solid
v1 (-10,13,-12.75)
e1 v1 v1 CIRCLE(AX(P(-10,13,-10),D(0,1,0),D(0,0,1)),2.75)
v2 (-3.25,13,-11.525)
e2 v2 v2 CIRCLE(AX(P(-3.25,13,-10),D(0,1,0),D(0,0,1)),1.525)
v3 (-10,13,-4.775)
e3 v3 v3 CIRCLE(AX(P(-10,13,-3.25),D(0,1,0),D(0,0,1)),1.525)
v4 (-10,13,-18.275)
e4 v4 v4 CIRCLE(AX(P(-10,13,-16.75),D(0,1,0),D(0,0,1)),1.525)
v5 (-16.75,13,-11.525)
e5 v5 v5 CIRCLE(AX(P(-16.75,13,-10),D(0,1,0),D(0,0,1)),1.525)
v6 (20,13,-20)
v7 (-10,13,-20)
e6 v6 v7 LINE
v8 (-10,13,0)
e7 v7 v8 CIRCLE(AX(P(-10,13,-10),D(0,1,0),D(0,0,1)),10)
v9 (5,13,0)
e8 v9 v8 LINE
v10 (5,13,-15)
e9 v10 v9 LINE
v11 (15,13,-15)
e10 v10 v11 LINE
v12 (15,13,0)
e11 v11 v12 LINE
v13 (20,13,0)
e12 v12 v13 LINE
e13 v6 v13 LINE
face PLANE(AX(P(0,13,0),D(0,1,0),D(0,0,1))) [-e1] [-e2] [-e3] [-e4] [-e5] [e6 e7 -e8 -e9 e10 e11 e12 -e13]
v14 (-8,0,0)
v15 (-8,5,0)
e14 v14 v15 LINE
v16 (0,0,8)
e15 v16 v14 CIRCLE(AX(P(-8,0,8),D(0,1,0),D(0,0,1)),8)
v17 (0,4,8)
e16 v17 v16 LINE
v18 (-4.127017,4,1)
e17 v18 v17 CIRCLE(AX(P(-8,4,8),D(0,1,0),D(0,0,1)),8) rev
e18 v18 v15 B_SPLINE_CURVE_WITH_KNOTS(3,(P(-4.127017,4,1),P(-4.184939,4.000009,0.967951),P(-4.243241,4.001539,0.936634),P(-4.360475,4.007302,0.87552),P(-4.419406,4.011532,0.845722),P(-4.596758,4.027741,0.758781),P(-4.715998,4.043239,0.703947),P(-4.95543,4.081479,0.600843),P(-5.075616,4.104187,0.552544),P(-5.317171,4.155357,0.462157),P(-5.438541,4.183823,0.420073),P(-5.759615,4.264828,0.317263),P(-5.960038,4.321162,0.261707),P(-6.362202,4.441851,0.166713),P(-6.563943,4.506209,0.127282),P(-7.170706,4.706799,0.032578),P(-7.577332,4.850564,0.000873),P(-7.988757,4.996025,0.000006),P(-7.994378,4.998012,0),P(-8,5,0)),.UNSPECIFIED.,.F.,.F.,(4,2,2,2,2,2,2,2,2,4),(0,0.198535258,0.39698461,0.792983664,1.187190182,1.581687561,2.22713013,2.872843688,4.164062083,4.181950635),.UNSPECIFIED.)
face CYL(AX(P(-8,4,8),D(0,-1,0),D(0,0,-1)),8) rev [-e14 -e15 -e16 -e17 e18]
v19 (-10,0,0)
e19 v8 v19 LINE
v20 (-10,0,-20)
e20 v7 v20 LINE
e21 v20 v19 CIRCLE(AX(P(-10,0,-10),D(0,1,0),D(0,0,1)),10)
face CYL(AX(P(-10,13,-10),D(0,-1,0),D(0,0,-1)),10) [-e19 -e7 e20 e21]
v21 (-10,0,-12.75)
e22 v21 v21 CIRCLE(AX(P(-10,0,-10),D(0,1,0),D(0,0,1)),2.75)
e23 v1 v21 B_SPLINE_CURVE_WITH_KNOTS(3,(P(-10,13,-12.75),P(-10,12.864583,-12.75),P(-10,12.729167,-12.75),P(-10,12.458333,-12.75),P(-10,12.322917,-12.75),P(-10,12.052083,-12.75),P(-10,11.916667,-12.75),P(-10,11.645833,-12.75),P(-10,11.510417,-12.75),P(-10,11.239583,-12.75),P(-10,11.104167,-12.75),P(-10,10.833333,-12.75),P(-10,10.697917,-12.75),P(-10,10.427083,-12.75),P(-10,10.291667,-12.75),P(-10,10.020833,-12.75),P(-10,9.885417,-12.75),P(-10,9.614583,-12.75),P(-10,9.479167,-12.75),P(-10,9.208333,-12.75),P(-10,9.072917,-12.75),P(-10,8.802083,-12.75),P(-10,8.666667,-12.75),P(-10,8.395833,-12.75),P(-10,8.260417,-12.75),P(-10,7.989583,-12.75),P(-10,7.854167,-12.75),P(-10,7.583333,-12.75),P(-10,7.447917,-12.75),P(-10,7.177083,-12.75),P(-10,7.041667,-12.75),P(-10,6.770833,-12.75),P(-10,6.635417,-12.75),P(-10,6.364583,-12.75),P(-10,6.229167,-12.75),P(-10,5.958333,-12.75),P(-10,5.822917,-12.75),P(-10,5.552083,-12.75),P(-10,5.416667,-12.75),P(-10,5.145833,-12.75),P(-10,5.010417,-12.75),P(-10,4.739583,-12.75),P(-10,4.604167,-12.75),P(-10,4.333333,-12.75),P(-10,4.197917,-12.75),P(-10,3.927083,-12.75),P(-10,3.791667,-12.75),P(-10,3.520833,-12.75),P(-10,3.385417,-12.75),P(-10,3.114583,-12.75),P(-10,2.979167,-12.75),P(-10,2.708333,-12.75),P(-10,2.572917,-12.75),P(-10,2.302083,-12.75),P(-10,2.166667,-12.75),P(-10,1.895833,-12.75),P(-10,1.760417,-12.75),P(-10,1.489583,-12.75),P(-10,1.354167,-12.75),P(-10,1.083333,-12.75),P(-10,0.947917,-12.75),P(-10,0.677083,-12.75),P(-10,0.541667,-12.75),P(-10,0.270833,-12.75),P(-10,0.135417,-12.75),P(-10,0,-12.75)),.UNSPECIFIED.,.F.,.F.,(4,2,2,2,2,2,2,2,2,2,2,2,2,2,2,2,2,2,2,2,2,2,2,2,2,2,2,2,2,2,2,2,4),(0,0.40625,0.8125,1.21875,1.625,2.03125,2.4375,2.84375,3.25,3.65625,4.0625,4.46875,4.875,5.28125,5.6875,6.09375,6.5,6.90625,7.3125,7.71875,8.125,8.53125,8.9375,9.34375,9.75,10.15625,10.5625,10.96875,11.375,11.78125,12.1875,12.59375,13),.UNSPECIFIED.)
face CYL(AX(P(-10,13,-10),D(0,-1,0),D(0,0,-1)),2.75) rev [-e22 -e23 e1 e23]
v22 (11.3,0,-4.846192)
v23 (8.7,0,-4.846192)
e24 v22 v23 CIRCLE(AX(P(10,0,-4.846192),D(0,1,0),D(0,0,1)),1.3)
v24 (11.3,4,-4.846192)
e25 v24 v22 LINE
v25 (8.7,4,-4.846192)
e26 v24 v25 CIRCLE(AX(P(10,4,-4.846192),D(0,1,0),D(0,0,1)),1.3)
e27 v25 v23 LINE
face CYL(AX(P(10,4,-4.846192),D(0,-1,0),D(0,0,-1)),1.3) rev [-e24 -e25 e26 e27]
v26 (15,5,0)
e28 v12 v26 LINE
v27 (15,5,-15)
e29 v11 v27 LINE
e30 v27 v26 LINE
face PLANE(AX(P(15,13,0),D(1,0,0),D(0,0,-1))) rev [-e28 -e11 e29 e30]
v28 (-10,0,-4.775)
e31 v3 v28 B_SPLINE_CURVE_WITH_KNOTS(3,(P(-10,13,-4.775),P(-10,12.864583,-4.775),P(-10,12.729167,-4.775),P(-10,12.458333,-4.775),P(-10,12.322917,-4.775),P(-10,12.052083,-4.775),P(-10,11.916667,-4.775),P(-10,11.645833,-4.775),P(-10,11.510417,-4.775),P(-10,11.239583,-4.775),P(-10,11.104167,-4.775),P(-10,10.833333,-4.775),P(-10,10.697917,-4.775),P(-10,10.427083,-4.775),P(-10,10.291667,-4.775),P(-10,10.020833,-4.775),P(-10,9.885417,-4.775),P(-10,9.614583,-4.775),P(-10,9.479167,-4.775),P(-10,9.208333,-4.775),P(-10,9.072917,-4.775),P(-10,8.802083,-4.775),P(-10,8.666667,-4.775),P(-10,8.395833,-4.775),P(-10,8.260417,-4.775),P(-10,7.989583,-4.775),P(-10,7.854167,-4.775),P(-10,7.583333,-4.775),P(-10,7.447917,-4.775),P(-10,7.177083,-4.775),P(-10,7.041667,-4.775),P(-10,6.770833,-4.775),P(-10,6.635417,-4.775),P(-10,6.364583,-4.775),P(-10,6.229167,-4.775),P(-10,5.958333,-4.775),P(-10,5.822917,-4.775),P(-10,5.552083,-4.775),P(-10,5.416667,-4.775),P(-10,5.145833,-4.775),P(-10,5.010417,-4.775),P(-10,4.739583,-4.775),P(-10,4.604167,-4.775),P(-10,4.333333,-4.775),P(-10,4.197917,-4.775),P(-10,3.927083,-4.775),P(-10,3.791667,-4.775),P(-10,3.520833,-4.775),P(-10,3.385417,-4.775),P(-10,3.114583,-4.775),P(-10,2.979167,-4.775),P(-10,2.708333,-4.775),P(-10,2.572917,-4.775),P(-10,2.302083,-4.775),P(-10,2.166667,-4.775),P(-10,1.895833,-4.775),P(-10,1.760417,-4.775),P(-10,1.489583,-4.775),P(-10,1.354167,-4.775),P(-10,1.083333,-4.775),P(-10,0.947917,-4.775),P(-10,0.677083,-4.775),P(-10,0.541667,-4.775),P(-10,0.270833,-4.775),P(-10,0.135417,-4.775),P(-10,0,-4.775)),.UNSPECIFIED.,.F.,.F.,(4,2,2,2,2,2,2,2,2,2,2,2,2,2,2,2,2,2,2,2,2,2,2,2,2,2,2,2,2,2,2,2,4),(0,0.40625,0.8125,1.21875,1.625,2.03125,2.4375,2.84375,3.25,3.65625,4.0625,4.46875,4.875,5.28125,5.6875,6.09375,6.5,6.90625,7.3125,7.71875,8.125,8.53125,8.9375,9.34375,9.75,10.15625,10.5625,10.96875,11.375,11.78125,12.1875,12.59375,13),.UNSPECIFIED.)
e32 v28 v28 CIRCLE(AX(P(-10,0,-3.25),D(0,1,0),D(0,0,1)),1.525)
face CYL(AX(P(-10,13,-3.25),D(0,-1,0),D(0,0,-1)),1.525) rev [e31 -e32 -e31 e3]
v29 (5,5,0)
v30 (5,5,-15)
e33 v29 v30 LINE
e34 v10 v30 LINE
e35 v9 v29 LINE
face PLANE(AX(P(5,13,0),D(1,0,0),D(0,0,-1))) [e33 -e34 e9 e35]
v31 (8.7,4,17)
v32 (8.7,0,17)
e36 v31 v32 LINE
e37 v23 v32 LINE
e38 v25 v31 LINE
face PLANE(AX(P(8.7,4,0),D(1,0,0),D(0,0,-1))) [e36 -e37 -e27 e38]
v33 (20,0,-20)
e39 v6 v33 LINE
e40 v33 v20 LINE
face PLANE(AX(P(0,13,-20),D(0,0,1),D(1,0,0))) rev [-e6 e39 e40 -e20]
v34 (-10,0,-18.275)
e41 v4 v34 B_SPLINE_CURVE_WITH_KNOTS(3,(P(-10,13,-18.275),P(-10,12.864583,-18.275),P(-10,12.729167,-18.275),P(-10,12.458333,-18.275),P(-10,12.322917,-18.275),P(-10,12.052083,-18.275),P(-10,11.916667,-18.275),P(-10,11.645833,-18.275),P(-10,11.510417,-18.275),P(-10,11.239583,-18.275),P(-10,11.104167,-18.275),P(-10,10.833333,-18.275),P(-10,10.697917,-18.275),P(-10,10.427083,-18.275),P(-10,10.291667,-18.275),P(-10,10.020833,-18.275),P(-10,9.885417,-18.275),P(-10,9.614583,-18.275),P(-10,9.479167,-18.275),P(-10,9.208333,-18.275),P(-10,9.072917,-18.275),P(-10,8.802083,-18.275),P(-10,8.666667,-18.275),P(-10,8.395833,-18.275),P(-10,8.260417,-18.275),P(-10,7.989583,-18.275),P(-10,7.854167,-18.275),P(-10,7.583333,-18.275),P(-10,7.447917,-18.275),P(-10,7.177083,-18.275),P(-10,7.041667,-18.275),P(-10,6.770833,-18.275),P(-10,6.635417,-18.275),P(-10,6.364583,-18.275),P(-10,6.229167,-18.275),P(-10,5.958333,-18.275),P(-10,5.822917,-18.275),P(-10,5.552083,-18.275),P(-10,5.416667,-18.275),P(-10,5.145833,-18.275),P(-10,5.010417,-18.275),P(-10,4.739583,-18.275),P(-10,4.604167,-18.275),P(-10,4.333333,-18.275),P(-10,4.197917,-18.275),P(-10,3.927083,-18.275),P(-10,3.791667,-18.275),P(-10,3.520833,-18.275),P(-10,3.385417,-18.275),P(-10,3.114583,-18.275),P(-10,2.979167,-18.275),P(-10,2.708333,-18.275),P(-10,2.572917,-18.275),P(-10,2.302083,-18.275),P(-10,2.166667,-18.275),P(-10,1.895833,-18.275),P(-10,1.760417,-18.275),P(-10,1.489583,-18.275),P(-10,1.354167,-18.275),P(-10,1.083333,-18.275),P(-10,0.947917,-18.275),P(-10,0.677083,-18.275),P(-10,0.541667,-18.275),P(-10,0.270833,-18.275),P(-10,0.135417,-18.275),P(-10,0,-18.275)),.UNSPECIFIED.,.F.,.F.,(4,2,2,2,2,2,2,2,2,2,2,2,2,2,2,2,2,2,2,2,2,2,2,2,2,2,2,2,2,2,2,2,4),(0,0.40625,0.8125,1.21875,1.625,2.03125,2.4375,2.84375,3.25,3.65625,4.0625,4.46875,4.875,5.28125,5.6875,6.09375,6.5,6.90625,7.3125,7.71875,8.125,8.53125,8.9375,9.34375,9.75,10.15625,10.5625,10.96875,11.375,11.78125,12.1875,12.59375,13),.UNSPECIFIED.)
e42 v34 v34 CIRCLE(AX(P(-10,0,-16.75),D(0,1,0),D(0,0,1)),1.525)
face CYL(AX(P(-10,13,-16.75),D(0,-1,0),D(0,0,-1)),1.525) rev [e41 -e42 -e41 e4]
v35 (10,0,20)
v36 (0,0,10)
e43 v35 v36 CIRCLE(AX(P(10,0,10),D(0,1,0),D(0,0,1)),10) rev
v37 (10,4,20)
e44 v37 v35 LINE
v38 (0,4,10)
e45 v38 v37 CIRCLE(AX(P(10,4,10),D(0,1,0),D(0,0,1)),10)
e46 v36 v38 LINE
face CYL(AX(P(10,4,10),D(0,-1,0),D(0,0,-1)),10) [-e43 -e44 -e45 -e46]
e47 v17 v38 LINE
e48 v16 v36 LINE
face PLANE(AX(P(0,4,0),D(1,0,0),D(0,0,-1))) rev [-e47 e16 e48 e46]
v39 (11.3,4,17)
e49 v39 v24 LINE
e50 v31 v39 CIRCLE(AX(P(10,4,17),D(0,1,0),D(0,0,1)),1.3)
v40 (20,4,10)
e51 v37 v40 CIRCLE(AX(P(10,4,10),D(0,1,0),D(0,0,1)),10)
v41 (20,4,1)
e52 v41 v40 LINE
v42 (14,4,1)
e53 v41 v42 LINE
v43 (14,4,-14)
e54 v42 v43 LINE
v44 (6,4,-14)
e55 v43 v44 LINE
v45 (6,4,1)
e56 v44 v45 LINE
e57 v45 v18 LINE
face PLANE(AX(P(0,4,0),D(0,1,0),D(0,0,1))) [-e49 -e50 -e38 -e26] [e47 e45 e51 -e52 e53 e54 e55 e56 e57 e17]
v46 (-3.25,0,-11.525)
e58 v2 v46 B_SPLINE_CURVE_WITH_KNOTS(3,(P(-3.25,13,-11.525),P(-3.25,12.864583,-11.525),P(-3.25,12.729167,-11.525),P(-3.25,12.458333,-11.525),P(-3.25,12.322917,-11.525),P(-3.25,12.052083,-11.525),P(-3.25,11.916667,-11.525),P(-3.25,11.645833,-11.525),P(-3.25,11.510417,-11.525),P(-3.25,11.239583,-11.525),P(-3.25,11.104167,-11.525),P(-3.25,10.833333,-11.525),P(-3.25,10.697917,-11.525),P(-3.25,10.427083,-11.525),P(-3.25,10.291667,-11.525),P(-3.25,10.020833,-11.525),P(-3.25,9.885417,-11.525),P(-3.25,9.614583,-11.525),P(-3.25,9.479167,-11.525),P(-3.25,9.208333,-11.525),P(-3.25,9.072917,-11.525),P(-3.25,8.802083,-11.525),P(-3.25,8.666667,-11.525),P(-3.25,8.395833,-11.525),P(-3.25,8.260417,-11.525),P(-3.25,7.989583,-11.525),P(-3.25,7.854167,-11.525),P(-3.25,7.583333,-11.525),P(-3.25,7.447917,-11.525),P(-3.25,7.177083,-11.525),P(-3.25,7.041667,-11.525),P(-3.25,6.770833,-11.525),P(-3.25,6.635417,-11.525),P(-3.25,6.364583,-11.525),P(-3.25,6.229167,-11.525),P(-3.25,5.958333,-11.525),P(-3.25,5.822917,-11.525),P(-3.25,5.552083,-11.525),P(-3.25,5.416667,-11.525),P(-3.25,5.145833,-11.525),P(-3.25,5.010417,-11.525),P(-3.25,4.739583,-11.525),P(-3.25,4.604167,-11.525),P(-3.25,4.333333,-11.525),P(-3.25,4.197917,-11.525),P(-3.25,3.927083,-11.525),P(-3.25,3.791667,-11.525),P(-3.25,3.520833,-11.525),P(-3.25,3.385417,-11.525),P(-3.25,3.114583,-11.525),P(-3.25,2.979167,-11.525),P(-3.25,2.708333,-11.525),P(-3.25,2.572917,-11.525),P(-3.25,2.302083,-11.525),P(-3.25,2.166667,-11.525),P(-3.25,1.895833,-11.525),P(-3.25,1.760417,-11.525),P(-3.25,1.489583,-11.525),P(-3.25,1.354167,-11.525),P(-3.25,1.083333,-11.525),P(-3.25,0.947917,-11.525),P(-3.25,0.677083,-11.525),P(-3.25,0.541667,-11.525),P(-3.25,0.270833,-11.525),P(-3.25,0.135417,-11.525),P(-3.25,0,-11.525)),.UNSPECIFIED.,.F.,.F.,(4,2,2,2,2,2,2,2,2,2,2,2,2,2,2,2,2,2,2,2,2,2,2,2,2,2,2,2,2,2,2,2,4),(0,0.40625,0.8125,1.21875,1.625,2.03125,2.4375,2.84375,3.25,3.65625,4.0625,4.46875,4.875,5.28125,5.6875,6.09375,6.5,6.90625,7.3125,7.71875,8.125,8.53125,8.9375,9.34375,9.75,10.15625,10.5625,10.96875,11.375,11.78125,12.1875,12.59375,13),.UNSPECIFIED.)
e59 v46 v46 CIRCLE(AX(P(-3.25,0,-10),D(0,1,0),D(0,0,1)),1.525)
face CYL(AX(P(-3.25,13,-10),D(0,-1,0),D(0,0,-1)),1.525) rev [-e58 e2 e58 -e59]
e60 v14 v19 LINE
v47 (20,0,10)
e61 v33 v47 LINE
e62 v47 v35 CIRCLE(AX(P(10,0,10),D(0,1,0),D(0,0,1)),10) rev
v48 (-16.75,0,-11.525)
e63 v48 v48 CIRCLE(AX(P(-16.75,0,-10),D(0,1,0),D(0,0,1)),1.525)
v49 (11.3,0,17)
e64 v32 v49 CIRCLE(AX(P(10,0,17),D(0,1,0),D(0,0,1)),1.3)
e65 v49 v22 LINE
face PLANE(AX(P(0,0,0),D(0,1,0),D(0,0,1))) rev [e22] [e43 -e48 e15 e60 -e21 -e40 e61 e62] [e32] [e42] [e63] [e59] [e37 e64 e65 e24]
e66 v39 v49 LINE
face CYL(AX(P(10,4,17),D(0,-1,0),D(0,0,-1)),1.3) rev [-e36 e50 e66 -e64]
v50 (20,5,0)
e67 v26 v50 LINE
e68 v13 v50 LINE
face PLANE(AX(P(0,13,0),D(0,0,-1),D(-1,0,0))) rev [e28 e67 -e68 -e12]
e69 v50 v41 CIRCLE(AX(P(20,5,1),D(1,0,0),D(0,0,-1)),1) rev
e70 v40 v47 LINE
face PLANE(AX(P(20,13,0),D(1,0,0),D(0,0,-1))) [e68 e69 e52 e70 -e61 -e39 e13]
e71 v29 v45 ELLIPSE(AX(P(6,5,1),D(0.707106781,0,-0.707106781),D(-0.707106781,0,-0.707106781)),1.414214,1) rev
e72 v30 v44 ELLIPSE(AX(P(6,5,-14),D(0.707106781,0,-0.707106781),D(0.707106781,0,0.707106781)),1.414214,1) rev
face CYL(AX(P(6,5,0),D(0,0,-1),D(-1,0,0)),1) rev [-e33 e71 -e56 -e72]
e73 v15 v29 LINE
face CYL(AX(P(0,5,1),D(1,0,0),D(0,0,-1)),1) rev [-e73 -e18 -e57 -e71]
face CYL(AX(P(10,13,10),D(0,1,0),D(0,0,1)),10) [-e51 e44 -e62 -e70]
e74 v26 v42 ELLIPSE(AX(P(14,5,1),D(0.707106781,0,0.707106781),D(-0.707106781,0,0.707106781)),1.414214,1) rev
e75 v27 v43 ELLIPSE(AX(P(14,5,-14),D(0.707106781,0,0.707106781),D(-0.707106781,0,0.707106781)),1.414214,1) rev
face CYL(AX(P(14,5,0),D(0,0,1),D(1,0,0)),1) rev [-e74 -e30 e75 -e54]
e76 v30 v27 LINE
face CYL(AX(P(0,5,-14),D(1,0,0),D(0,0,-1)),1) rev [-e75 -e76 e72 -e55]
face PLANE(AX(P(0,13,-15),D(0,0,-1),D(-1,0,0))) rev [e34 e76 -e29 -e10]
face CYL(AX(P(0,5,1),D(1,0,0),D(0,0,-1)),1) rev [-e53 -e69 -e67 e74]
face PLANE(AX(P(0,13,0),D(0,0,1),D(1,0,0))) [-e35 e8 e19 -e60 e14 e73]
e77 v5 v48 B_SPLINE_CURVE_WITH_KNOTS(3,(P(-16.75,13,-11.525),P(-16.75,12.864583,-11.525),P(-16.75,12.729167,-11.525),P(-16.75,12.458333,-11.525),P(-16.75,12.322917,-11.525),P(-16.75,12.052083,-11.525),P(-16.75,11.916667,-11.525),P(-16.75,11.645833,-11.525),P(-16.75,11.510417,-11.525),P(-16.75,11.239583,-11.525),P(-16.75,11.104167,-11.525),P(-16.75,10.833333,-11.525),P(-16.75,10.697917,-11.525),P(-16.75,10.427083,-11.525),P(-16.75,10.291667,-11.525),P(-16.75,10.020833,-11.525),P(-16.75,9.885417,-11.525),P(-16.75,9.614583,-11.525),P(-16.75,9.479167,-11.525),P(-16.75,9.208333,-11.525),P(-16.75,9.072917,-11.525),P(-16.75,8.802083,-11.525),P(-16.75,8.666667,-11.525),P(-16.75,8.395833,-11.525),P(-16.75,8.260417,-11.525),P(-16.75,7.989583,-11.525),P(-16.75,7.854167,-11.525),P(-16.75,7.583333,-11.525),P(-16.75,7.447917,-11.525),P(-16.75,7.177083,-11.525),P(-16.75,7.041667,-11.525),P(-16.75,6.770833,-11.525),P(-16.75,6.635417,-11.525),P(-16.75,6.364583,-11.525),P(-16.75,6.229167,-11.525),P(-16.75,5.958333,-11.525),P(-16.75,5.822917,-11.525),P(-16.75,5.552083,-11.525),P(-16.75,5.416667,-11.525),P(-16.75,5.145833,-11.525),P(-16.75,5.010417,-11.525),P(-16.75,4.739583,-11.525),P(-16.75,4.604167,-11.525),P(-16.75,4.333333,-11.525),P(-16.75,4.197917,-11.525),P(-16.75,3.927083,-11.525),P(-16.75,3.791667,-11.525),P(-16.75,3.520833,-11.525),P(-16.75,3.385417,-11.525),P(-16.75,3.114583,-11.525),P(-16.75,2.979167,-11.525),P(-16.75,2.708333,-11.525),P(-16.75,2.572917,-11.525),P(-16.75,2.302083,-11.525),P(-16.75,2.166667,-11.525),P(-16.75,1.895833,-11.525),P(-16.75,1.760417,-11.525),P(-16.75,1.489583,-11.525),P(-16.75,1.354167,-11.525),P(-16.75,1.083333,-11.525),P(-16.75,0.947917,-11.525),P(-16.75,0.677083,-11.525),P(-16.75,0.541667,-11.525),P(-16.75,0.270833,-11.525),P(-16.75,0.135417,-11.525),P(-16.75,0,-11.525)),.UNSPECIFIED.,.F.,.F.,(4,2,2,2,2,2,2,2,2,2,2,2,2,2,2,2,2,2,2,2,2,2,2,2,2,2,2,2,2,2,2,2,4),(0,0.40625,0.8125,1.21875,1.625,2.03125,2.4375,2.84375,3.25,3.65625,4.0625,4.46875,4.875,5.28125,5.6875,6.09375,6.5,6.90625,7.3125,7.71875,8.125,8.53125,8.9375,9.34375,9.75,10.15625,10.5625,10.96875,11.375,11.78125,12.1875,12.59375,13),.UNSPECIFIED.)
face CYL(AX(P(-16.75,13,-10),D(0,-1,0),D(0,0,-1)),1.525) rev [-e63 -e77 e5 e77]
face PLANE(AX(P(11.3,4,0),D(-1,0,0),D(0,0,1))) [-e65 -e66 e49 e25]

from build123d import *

# Parameters (mm, degrees)
SKETCH_1_R      = 1.525
SKETCH_1_R_2    = 2.75
EXTRUDE_1_DEPTH = 13
EXTRUDE_2_DEPTH = 4
FILLET_1_R      = 8
FILLET_2_R      = 1
FILLET_3_R      = 10


with BuildPart() as part:
    # 草图1 → 凸台-拉伸1 (new body)
    with BuildSketch(Plane(origin=(0, 0, 0), x_dir=(1, 0, 0), z_dir=(0, 1, 0))):
        with BuildLine():
            Line((-10, 0), (0, 0))
            Line((0, 0), (5, 0))
            Line((5, 0), (5, 15))
            Line((5, 15), (15, 15))
            Line((15, 15), (15, 0))
            Line((15, 0), (20, 0))
            Line((20, 0), (20, 20))
            Line((20, 20), (0, 20))
            Line((0, 20), (-10, 20))
            ThreePointArc((-10, 20), (-20, 10), (-10, 0))
        make_face()
        with Locations(Location((-10, 3.25, 0), (0, 0, 90))):
            Circle(SKETCH_1_R, mode=Mode.SUBTRACT)
        with Locations(Location((-16.75, 10, 0), (0, 0, 90))):
            Circle(SKETCH_1_R, mode=Mode.SUBTRACT)
        with Locations(Location((-10, 10, 0), (0, 0, 90))):
            Circle(SKETCH_1_R_2, mode=Mode.SUBTRACT)
        with Locations(Location((-10, 16.75, 0), (0, 0, 90))):
            Circle(SKETCH_1_R, mode=Mode.SUBTRACT)
        with Locations(Location((-3.25, 10, 0), (0, 0, 90))):
            Circle(SKETCH_1_R, mode=Mode.SUBTRACT)
    extrude(amount=EXTRUDE_1_DEPTH)

    # 草图1<3> → 凸台-拉伸2 (add)
    with BuildSketch(Plane(origin=(0, 0, 0), x_dir=(1, 0, 0), z_dir=(0, 1, 0))):
        Polygon((5, 0), (0, 0), (0, -20), (20, -20), (20, 0), (15, 0), (15, 15), (5, 15), align=None)
        with BuildLine():
            Line((8.7, -17), (8.7, 4.846192362))
            ThreePointArc((8.7, 4.846192362), (10, 6.146192362), (11.3, 4.846192362))
            Line((11.3, 4.846192362), (11.3, -17))
            ThreePointArc((11.3, -17), (10, -18.3), (8.7, -17))
        make_face(mode=Mode.SUBTRACT)
    extrude(amount=EXTRUDE_2_DEPTH)

    # 圆角1
    fillet_1_edges = [part.edges().sort_by_distance(p)[0] for p in [
        (0, 2, 0),
    ]]
    fillet(fillet_1_edges, radius=FILLET_1_R)

    # 圆角2
    fillet_2_edges = [part.edges().sort_by_distance(p)[0] for p in [
        (17.5, 4, 0),
        (15, 4, -7.5),
        (10, 4, -15),
        (5, 4, -7.5),
        (-1.5, 4, 0),
    ]]
    fillet(fillet_2_edges, radius=FILLET_2_R)

    # 圆角3
    fillet_3_edges = [part.edges().sort_by_distance(p)[0] for p in [
        (20, 2, 20),
        (0, 2, 20),
    ]]
    fillet(fillet_3_edges, radius=FILLET_3_R - 0.0001)  # a hair under: the kernel refuses the full size


solid = part.part
